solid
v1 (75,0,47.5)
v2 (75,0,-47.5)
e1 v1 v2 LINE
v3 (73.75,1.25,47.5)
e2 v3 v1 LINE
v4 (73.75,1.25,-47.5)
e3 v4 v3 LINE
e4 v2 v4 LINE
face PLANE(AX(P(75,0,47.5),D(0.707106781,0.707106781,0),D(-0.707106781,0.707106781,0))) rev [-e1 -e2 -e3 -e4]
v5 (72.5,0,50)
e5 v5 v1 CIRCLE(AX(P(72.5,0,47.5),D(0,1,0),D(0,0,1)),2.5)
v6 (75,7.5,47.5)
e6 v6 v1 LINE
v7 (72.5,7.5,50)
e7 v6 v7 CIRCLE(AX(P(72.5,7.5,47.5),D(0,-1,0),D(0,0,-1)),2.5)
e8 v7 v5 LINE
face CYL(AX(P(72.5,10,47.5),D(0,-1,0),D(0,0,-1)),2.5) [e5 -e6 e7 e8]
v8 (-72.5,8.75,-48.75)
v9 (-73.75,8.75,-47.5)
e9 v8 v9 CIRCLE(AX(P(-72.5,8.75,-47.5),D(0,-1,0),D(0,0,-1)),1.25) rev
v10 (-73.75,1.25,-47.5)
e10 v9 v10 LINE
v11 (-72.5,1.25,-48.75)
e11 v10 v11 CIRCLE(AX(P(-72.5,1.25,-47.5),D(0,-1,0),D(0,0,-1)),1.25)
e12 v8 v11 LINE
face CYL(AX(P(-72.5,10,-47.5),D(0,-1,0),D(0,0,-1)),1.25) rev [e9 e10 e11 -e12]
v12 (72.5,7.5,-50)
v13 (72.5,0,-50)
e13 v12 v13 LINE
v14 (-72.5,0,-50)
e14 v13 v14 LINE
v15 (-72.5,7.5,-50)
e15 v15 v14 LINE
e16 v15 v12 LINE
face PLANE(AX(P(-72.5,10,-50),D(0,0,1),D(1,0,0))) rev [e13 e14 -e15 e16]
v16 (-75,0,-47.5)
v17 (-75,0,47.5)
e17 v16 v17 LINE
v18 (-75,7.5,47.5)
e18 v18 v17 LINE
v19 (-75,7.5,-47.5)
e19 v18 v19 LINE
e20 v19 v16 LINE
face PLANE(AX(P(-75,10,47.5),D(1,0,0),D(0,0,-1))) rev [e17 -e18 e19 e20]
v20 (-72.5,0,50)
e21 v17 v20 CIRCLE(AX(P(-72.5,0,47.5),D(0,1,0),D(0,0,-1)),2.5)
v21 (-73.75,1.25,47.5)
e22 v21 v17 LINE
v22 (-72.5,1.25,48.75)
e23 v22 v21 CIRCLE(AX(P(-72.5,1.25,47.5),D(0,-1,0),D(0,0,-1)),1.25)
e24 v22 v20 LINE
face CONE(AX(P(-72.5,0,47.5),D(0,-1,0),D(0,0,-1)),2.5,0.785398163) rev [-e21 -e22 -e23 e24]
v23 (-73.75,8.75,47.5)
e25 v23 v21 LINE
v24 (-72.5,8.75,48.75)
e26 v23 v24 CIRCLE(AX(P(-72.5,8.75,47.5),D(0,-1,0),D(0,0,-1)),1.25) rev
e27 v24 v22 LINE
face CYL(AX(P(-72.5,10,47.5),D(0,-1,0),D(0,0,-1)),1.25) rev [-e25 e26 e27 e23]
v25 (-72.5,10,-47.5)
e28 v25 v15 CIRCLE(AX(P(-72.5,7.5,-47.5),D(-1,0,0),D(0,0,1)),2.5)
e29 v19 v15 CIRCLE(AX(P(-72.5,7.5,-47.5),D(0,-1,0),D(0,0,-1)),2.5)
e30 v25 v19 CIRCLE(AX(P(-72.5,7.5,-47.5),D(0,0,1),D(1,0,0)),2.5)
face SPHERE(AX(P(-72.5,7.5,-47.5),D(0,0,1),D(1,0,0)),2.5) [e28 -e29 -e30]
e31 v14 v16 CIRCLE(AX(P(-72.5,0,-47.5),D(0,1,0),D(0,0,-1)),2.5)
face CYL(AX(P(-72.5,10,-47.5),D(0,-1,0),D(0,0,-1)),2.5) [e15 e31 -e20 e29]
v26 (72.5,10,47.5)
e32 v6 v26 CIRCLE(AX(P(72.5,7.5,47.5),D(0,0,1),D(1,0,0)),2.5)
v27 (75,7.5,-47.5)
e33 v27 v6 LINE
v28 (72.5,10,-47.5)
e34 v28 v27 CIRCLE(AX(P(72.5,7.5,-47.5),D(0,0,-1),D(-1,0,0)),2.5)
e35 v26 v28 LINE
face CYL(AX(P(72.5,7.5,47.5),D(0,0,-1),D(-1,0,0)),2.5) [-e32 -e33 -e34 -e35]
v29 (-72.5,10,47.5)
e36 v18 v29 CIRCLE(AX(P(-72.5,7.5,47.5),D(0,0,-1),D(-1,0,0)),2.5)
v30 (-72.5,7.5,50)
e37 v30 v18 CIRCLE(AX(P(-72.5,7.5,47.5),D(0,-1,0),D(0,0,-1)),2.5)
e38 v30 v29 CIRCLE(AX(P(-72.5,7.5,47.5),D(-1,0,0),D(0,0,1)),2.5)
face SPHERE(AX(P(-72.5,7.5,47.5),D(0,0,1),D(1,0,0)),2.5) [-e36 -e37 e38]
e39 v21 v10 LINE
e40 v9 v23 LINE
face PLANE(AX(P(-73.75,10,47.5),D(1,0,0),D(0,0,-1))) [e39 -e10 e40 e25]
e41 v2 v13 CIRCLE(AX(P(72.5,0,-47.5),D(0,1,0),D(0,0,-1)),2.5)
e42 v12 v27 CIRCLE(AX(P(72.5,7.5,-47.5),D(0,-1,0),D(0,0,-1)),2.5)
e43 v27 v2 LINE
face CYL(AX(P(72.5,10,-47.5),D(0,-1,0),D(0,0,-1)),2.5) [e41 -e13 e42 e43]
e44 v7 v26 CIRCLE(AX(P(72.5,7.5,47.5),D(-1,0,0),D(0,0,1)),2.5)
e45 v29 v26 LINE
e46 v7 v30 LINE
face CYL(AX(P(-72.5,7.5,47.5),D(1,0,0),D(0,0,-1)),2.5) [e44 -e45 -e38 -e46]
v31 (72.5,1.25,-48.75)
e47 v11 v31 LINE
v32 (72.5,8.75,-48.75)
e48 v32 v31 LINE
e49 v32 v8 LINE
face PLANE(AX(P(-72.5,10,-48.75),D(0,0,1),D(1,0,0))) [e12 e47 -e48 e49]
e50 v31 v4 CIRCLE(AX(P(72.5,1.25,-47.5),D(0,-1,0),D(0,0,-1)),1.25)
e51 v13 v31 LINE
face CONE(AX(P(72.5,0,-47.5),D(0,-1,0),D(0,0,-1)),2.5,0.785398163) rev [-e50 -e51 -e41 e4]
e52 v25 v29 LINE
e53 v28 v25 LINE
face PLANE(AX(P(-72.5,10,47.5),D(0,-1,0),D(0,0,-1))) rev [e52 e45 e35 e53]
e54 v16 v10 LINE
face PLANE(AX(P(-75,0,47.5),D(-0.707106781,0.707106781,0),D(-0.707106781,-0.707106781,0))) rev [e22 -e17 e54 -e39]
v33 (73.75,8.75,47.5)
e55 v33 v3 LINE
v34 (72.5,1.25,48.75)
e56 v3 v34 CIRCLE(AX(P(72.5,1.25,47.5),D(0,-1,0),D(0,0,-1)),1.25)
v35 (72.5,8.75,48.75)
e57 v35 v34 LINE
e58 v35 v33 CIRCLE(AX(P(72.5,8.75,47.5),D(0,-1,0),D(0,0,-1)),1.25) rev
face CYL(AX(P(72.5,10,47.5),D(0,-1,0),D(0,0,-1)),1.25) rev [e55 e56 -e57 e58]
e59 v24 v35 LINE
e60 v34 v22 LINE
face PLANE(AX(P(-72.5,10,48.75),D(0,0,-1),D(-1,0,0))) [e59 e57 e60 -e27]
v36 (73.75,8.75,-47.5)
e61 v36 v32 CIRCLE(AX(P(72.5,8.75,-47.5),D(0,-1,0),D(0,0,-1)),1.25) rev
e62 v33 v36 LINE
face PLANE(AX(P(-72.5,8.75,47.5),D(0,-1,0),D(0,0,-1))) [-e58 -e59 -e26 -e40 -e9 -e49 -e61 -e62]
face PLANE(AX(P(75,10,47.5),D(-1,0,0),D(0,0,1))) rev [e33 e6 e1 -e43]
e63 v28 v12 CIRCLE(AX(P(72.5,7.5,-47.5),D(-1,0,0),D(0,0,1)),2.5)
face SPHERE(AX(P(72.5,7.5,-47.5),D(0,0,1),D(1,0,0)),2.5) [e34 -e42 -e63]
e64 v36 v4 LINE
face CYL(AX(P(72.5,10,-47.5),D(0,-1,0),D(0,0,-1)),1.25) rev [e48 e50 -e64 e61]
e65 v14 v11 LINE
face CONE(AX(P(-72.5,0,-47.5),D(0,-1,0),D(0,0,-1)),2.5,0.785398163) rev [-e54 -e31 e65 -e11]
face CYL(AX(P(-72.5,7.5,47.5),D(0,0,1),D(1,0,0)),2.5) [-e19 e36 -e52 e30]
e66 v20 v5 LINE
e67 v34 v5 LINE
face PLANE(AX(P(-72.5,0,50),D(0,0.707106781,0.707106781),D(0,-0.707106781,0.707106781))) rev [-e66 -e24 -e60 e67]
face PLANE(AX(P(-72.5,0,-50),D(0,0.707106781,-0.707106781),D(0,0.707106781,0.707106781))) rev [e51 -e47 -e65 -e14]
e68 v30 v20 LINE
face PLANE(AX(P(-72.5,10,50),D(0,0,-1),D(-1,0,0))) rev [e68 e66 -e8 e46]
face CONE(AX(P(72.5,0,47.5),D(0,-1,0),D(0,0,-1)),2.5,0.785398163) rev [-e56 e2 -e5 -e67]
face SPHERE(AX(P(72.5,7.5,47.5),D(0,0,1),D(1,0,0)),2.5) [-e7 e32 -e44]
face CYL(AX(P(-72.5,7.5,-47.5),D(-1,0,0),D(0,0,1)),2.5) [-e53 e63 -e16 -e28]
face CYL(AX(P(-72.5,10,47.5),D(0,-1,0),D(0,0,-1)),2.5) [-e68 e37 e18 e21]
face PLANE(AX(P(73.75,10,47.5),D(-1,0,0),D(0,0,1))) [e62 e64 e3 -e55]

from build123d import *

# Parameters (mm, degrees)
BOSS_EXTRUDE1_DEPTH = 10
SHELL1_T            = -1.25
FILLET1_R           = 2.5
CHAMFER1_SIZE       = 1.25


with BuildPart() as part:
    # Sketch1 → Boss-Extrude1 (new body)
    with BuildSketch(Plane(origin=(0, 0, 0), x_dir=(1, 0, 0), z_dir=(0, 1, 0))):
        with BuildLine():
            Line((-72.5, -50), (72.5, -50))
            ThreePointArc((72.5, -50), (74.267766953, -49.267766953), (75, -47.5))
            Line((75, -47.5), (75, 47.5))
            ThreePointArc((75, 47.5), (74.267766953, 49.267766953), (72.5, 50))
            Line((72.5, 50), (-72.5, 50))
            ThreePointArc((-72.5, 50), (-74.267766953, 49.267766953), (-75, 47.5))
            Line((-75, 47.5), (-75, -47.5))
            ThreePointArc((-75, -47.5), (-74.267766953, -49.267766953), (-72.5, -50))
        make_face()
    extrude(amount=BOSS_EXTRUDE1_DEPTH)

    # Shell1
    shell1_openings = [part.faces().sort_by_distance(p)[0] for p in [
        (0, 0, 0),
    ]]
    offset(amount=SHELL1_T, openings=shell1_openings, kind=Kind.INTERSECTION)

    # Fillet1
    fillet1_edges = [part.edges().sort_by_distance(p)[0] for p in [
        (74.267766953, 10, 49.267766953),
        (75, 10, 0),
        (74.267766953, 10, -49.267766953),
        (0, 10, -50),
        (-74.267766953, 10, -49.267766953),
        (-75, 10, 0),
        (-74.267766953, 10, 49.267766953),
        (0, 10, 50),
    ]]
    fillet(fillet1_edges, radius=FILLET1_R)

    # Chamfer1
    chamfer1_edges = [part.edges().sort_by_distance(p)[0] for p in [
        (-73.383883476, 0, 48.383883476),
        (0, 0, 48.75),
        (73.383883476, 0, 48.383883476),
        (73.75, 0, 0),
        (73.383883476, 0, -48.383883476),
        (0, 0, -48.75),
        (-73.383883476, 0, -48.383883476),
        (-73.75, 0, 0),
    ]]
    chamfer(chamfer1_edges, length=CHAMFER1_SIZE - 0.0001)  # a hair under: the kernel refuses the full size


solid = part.part
